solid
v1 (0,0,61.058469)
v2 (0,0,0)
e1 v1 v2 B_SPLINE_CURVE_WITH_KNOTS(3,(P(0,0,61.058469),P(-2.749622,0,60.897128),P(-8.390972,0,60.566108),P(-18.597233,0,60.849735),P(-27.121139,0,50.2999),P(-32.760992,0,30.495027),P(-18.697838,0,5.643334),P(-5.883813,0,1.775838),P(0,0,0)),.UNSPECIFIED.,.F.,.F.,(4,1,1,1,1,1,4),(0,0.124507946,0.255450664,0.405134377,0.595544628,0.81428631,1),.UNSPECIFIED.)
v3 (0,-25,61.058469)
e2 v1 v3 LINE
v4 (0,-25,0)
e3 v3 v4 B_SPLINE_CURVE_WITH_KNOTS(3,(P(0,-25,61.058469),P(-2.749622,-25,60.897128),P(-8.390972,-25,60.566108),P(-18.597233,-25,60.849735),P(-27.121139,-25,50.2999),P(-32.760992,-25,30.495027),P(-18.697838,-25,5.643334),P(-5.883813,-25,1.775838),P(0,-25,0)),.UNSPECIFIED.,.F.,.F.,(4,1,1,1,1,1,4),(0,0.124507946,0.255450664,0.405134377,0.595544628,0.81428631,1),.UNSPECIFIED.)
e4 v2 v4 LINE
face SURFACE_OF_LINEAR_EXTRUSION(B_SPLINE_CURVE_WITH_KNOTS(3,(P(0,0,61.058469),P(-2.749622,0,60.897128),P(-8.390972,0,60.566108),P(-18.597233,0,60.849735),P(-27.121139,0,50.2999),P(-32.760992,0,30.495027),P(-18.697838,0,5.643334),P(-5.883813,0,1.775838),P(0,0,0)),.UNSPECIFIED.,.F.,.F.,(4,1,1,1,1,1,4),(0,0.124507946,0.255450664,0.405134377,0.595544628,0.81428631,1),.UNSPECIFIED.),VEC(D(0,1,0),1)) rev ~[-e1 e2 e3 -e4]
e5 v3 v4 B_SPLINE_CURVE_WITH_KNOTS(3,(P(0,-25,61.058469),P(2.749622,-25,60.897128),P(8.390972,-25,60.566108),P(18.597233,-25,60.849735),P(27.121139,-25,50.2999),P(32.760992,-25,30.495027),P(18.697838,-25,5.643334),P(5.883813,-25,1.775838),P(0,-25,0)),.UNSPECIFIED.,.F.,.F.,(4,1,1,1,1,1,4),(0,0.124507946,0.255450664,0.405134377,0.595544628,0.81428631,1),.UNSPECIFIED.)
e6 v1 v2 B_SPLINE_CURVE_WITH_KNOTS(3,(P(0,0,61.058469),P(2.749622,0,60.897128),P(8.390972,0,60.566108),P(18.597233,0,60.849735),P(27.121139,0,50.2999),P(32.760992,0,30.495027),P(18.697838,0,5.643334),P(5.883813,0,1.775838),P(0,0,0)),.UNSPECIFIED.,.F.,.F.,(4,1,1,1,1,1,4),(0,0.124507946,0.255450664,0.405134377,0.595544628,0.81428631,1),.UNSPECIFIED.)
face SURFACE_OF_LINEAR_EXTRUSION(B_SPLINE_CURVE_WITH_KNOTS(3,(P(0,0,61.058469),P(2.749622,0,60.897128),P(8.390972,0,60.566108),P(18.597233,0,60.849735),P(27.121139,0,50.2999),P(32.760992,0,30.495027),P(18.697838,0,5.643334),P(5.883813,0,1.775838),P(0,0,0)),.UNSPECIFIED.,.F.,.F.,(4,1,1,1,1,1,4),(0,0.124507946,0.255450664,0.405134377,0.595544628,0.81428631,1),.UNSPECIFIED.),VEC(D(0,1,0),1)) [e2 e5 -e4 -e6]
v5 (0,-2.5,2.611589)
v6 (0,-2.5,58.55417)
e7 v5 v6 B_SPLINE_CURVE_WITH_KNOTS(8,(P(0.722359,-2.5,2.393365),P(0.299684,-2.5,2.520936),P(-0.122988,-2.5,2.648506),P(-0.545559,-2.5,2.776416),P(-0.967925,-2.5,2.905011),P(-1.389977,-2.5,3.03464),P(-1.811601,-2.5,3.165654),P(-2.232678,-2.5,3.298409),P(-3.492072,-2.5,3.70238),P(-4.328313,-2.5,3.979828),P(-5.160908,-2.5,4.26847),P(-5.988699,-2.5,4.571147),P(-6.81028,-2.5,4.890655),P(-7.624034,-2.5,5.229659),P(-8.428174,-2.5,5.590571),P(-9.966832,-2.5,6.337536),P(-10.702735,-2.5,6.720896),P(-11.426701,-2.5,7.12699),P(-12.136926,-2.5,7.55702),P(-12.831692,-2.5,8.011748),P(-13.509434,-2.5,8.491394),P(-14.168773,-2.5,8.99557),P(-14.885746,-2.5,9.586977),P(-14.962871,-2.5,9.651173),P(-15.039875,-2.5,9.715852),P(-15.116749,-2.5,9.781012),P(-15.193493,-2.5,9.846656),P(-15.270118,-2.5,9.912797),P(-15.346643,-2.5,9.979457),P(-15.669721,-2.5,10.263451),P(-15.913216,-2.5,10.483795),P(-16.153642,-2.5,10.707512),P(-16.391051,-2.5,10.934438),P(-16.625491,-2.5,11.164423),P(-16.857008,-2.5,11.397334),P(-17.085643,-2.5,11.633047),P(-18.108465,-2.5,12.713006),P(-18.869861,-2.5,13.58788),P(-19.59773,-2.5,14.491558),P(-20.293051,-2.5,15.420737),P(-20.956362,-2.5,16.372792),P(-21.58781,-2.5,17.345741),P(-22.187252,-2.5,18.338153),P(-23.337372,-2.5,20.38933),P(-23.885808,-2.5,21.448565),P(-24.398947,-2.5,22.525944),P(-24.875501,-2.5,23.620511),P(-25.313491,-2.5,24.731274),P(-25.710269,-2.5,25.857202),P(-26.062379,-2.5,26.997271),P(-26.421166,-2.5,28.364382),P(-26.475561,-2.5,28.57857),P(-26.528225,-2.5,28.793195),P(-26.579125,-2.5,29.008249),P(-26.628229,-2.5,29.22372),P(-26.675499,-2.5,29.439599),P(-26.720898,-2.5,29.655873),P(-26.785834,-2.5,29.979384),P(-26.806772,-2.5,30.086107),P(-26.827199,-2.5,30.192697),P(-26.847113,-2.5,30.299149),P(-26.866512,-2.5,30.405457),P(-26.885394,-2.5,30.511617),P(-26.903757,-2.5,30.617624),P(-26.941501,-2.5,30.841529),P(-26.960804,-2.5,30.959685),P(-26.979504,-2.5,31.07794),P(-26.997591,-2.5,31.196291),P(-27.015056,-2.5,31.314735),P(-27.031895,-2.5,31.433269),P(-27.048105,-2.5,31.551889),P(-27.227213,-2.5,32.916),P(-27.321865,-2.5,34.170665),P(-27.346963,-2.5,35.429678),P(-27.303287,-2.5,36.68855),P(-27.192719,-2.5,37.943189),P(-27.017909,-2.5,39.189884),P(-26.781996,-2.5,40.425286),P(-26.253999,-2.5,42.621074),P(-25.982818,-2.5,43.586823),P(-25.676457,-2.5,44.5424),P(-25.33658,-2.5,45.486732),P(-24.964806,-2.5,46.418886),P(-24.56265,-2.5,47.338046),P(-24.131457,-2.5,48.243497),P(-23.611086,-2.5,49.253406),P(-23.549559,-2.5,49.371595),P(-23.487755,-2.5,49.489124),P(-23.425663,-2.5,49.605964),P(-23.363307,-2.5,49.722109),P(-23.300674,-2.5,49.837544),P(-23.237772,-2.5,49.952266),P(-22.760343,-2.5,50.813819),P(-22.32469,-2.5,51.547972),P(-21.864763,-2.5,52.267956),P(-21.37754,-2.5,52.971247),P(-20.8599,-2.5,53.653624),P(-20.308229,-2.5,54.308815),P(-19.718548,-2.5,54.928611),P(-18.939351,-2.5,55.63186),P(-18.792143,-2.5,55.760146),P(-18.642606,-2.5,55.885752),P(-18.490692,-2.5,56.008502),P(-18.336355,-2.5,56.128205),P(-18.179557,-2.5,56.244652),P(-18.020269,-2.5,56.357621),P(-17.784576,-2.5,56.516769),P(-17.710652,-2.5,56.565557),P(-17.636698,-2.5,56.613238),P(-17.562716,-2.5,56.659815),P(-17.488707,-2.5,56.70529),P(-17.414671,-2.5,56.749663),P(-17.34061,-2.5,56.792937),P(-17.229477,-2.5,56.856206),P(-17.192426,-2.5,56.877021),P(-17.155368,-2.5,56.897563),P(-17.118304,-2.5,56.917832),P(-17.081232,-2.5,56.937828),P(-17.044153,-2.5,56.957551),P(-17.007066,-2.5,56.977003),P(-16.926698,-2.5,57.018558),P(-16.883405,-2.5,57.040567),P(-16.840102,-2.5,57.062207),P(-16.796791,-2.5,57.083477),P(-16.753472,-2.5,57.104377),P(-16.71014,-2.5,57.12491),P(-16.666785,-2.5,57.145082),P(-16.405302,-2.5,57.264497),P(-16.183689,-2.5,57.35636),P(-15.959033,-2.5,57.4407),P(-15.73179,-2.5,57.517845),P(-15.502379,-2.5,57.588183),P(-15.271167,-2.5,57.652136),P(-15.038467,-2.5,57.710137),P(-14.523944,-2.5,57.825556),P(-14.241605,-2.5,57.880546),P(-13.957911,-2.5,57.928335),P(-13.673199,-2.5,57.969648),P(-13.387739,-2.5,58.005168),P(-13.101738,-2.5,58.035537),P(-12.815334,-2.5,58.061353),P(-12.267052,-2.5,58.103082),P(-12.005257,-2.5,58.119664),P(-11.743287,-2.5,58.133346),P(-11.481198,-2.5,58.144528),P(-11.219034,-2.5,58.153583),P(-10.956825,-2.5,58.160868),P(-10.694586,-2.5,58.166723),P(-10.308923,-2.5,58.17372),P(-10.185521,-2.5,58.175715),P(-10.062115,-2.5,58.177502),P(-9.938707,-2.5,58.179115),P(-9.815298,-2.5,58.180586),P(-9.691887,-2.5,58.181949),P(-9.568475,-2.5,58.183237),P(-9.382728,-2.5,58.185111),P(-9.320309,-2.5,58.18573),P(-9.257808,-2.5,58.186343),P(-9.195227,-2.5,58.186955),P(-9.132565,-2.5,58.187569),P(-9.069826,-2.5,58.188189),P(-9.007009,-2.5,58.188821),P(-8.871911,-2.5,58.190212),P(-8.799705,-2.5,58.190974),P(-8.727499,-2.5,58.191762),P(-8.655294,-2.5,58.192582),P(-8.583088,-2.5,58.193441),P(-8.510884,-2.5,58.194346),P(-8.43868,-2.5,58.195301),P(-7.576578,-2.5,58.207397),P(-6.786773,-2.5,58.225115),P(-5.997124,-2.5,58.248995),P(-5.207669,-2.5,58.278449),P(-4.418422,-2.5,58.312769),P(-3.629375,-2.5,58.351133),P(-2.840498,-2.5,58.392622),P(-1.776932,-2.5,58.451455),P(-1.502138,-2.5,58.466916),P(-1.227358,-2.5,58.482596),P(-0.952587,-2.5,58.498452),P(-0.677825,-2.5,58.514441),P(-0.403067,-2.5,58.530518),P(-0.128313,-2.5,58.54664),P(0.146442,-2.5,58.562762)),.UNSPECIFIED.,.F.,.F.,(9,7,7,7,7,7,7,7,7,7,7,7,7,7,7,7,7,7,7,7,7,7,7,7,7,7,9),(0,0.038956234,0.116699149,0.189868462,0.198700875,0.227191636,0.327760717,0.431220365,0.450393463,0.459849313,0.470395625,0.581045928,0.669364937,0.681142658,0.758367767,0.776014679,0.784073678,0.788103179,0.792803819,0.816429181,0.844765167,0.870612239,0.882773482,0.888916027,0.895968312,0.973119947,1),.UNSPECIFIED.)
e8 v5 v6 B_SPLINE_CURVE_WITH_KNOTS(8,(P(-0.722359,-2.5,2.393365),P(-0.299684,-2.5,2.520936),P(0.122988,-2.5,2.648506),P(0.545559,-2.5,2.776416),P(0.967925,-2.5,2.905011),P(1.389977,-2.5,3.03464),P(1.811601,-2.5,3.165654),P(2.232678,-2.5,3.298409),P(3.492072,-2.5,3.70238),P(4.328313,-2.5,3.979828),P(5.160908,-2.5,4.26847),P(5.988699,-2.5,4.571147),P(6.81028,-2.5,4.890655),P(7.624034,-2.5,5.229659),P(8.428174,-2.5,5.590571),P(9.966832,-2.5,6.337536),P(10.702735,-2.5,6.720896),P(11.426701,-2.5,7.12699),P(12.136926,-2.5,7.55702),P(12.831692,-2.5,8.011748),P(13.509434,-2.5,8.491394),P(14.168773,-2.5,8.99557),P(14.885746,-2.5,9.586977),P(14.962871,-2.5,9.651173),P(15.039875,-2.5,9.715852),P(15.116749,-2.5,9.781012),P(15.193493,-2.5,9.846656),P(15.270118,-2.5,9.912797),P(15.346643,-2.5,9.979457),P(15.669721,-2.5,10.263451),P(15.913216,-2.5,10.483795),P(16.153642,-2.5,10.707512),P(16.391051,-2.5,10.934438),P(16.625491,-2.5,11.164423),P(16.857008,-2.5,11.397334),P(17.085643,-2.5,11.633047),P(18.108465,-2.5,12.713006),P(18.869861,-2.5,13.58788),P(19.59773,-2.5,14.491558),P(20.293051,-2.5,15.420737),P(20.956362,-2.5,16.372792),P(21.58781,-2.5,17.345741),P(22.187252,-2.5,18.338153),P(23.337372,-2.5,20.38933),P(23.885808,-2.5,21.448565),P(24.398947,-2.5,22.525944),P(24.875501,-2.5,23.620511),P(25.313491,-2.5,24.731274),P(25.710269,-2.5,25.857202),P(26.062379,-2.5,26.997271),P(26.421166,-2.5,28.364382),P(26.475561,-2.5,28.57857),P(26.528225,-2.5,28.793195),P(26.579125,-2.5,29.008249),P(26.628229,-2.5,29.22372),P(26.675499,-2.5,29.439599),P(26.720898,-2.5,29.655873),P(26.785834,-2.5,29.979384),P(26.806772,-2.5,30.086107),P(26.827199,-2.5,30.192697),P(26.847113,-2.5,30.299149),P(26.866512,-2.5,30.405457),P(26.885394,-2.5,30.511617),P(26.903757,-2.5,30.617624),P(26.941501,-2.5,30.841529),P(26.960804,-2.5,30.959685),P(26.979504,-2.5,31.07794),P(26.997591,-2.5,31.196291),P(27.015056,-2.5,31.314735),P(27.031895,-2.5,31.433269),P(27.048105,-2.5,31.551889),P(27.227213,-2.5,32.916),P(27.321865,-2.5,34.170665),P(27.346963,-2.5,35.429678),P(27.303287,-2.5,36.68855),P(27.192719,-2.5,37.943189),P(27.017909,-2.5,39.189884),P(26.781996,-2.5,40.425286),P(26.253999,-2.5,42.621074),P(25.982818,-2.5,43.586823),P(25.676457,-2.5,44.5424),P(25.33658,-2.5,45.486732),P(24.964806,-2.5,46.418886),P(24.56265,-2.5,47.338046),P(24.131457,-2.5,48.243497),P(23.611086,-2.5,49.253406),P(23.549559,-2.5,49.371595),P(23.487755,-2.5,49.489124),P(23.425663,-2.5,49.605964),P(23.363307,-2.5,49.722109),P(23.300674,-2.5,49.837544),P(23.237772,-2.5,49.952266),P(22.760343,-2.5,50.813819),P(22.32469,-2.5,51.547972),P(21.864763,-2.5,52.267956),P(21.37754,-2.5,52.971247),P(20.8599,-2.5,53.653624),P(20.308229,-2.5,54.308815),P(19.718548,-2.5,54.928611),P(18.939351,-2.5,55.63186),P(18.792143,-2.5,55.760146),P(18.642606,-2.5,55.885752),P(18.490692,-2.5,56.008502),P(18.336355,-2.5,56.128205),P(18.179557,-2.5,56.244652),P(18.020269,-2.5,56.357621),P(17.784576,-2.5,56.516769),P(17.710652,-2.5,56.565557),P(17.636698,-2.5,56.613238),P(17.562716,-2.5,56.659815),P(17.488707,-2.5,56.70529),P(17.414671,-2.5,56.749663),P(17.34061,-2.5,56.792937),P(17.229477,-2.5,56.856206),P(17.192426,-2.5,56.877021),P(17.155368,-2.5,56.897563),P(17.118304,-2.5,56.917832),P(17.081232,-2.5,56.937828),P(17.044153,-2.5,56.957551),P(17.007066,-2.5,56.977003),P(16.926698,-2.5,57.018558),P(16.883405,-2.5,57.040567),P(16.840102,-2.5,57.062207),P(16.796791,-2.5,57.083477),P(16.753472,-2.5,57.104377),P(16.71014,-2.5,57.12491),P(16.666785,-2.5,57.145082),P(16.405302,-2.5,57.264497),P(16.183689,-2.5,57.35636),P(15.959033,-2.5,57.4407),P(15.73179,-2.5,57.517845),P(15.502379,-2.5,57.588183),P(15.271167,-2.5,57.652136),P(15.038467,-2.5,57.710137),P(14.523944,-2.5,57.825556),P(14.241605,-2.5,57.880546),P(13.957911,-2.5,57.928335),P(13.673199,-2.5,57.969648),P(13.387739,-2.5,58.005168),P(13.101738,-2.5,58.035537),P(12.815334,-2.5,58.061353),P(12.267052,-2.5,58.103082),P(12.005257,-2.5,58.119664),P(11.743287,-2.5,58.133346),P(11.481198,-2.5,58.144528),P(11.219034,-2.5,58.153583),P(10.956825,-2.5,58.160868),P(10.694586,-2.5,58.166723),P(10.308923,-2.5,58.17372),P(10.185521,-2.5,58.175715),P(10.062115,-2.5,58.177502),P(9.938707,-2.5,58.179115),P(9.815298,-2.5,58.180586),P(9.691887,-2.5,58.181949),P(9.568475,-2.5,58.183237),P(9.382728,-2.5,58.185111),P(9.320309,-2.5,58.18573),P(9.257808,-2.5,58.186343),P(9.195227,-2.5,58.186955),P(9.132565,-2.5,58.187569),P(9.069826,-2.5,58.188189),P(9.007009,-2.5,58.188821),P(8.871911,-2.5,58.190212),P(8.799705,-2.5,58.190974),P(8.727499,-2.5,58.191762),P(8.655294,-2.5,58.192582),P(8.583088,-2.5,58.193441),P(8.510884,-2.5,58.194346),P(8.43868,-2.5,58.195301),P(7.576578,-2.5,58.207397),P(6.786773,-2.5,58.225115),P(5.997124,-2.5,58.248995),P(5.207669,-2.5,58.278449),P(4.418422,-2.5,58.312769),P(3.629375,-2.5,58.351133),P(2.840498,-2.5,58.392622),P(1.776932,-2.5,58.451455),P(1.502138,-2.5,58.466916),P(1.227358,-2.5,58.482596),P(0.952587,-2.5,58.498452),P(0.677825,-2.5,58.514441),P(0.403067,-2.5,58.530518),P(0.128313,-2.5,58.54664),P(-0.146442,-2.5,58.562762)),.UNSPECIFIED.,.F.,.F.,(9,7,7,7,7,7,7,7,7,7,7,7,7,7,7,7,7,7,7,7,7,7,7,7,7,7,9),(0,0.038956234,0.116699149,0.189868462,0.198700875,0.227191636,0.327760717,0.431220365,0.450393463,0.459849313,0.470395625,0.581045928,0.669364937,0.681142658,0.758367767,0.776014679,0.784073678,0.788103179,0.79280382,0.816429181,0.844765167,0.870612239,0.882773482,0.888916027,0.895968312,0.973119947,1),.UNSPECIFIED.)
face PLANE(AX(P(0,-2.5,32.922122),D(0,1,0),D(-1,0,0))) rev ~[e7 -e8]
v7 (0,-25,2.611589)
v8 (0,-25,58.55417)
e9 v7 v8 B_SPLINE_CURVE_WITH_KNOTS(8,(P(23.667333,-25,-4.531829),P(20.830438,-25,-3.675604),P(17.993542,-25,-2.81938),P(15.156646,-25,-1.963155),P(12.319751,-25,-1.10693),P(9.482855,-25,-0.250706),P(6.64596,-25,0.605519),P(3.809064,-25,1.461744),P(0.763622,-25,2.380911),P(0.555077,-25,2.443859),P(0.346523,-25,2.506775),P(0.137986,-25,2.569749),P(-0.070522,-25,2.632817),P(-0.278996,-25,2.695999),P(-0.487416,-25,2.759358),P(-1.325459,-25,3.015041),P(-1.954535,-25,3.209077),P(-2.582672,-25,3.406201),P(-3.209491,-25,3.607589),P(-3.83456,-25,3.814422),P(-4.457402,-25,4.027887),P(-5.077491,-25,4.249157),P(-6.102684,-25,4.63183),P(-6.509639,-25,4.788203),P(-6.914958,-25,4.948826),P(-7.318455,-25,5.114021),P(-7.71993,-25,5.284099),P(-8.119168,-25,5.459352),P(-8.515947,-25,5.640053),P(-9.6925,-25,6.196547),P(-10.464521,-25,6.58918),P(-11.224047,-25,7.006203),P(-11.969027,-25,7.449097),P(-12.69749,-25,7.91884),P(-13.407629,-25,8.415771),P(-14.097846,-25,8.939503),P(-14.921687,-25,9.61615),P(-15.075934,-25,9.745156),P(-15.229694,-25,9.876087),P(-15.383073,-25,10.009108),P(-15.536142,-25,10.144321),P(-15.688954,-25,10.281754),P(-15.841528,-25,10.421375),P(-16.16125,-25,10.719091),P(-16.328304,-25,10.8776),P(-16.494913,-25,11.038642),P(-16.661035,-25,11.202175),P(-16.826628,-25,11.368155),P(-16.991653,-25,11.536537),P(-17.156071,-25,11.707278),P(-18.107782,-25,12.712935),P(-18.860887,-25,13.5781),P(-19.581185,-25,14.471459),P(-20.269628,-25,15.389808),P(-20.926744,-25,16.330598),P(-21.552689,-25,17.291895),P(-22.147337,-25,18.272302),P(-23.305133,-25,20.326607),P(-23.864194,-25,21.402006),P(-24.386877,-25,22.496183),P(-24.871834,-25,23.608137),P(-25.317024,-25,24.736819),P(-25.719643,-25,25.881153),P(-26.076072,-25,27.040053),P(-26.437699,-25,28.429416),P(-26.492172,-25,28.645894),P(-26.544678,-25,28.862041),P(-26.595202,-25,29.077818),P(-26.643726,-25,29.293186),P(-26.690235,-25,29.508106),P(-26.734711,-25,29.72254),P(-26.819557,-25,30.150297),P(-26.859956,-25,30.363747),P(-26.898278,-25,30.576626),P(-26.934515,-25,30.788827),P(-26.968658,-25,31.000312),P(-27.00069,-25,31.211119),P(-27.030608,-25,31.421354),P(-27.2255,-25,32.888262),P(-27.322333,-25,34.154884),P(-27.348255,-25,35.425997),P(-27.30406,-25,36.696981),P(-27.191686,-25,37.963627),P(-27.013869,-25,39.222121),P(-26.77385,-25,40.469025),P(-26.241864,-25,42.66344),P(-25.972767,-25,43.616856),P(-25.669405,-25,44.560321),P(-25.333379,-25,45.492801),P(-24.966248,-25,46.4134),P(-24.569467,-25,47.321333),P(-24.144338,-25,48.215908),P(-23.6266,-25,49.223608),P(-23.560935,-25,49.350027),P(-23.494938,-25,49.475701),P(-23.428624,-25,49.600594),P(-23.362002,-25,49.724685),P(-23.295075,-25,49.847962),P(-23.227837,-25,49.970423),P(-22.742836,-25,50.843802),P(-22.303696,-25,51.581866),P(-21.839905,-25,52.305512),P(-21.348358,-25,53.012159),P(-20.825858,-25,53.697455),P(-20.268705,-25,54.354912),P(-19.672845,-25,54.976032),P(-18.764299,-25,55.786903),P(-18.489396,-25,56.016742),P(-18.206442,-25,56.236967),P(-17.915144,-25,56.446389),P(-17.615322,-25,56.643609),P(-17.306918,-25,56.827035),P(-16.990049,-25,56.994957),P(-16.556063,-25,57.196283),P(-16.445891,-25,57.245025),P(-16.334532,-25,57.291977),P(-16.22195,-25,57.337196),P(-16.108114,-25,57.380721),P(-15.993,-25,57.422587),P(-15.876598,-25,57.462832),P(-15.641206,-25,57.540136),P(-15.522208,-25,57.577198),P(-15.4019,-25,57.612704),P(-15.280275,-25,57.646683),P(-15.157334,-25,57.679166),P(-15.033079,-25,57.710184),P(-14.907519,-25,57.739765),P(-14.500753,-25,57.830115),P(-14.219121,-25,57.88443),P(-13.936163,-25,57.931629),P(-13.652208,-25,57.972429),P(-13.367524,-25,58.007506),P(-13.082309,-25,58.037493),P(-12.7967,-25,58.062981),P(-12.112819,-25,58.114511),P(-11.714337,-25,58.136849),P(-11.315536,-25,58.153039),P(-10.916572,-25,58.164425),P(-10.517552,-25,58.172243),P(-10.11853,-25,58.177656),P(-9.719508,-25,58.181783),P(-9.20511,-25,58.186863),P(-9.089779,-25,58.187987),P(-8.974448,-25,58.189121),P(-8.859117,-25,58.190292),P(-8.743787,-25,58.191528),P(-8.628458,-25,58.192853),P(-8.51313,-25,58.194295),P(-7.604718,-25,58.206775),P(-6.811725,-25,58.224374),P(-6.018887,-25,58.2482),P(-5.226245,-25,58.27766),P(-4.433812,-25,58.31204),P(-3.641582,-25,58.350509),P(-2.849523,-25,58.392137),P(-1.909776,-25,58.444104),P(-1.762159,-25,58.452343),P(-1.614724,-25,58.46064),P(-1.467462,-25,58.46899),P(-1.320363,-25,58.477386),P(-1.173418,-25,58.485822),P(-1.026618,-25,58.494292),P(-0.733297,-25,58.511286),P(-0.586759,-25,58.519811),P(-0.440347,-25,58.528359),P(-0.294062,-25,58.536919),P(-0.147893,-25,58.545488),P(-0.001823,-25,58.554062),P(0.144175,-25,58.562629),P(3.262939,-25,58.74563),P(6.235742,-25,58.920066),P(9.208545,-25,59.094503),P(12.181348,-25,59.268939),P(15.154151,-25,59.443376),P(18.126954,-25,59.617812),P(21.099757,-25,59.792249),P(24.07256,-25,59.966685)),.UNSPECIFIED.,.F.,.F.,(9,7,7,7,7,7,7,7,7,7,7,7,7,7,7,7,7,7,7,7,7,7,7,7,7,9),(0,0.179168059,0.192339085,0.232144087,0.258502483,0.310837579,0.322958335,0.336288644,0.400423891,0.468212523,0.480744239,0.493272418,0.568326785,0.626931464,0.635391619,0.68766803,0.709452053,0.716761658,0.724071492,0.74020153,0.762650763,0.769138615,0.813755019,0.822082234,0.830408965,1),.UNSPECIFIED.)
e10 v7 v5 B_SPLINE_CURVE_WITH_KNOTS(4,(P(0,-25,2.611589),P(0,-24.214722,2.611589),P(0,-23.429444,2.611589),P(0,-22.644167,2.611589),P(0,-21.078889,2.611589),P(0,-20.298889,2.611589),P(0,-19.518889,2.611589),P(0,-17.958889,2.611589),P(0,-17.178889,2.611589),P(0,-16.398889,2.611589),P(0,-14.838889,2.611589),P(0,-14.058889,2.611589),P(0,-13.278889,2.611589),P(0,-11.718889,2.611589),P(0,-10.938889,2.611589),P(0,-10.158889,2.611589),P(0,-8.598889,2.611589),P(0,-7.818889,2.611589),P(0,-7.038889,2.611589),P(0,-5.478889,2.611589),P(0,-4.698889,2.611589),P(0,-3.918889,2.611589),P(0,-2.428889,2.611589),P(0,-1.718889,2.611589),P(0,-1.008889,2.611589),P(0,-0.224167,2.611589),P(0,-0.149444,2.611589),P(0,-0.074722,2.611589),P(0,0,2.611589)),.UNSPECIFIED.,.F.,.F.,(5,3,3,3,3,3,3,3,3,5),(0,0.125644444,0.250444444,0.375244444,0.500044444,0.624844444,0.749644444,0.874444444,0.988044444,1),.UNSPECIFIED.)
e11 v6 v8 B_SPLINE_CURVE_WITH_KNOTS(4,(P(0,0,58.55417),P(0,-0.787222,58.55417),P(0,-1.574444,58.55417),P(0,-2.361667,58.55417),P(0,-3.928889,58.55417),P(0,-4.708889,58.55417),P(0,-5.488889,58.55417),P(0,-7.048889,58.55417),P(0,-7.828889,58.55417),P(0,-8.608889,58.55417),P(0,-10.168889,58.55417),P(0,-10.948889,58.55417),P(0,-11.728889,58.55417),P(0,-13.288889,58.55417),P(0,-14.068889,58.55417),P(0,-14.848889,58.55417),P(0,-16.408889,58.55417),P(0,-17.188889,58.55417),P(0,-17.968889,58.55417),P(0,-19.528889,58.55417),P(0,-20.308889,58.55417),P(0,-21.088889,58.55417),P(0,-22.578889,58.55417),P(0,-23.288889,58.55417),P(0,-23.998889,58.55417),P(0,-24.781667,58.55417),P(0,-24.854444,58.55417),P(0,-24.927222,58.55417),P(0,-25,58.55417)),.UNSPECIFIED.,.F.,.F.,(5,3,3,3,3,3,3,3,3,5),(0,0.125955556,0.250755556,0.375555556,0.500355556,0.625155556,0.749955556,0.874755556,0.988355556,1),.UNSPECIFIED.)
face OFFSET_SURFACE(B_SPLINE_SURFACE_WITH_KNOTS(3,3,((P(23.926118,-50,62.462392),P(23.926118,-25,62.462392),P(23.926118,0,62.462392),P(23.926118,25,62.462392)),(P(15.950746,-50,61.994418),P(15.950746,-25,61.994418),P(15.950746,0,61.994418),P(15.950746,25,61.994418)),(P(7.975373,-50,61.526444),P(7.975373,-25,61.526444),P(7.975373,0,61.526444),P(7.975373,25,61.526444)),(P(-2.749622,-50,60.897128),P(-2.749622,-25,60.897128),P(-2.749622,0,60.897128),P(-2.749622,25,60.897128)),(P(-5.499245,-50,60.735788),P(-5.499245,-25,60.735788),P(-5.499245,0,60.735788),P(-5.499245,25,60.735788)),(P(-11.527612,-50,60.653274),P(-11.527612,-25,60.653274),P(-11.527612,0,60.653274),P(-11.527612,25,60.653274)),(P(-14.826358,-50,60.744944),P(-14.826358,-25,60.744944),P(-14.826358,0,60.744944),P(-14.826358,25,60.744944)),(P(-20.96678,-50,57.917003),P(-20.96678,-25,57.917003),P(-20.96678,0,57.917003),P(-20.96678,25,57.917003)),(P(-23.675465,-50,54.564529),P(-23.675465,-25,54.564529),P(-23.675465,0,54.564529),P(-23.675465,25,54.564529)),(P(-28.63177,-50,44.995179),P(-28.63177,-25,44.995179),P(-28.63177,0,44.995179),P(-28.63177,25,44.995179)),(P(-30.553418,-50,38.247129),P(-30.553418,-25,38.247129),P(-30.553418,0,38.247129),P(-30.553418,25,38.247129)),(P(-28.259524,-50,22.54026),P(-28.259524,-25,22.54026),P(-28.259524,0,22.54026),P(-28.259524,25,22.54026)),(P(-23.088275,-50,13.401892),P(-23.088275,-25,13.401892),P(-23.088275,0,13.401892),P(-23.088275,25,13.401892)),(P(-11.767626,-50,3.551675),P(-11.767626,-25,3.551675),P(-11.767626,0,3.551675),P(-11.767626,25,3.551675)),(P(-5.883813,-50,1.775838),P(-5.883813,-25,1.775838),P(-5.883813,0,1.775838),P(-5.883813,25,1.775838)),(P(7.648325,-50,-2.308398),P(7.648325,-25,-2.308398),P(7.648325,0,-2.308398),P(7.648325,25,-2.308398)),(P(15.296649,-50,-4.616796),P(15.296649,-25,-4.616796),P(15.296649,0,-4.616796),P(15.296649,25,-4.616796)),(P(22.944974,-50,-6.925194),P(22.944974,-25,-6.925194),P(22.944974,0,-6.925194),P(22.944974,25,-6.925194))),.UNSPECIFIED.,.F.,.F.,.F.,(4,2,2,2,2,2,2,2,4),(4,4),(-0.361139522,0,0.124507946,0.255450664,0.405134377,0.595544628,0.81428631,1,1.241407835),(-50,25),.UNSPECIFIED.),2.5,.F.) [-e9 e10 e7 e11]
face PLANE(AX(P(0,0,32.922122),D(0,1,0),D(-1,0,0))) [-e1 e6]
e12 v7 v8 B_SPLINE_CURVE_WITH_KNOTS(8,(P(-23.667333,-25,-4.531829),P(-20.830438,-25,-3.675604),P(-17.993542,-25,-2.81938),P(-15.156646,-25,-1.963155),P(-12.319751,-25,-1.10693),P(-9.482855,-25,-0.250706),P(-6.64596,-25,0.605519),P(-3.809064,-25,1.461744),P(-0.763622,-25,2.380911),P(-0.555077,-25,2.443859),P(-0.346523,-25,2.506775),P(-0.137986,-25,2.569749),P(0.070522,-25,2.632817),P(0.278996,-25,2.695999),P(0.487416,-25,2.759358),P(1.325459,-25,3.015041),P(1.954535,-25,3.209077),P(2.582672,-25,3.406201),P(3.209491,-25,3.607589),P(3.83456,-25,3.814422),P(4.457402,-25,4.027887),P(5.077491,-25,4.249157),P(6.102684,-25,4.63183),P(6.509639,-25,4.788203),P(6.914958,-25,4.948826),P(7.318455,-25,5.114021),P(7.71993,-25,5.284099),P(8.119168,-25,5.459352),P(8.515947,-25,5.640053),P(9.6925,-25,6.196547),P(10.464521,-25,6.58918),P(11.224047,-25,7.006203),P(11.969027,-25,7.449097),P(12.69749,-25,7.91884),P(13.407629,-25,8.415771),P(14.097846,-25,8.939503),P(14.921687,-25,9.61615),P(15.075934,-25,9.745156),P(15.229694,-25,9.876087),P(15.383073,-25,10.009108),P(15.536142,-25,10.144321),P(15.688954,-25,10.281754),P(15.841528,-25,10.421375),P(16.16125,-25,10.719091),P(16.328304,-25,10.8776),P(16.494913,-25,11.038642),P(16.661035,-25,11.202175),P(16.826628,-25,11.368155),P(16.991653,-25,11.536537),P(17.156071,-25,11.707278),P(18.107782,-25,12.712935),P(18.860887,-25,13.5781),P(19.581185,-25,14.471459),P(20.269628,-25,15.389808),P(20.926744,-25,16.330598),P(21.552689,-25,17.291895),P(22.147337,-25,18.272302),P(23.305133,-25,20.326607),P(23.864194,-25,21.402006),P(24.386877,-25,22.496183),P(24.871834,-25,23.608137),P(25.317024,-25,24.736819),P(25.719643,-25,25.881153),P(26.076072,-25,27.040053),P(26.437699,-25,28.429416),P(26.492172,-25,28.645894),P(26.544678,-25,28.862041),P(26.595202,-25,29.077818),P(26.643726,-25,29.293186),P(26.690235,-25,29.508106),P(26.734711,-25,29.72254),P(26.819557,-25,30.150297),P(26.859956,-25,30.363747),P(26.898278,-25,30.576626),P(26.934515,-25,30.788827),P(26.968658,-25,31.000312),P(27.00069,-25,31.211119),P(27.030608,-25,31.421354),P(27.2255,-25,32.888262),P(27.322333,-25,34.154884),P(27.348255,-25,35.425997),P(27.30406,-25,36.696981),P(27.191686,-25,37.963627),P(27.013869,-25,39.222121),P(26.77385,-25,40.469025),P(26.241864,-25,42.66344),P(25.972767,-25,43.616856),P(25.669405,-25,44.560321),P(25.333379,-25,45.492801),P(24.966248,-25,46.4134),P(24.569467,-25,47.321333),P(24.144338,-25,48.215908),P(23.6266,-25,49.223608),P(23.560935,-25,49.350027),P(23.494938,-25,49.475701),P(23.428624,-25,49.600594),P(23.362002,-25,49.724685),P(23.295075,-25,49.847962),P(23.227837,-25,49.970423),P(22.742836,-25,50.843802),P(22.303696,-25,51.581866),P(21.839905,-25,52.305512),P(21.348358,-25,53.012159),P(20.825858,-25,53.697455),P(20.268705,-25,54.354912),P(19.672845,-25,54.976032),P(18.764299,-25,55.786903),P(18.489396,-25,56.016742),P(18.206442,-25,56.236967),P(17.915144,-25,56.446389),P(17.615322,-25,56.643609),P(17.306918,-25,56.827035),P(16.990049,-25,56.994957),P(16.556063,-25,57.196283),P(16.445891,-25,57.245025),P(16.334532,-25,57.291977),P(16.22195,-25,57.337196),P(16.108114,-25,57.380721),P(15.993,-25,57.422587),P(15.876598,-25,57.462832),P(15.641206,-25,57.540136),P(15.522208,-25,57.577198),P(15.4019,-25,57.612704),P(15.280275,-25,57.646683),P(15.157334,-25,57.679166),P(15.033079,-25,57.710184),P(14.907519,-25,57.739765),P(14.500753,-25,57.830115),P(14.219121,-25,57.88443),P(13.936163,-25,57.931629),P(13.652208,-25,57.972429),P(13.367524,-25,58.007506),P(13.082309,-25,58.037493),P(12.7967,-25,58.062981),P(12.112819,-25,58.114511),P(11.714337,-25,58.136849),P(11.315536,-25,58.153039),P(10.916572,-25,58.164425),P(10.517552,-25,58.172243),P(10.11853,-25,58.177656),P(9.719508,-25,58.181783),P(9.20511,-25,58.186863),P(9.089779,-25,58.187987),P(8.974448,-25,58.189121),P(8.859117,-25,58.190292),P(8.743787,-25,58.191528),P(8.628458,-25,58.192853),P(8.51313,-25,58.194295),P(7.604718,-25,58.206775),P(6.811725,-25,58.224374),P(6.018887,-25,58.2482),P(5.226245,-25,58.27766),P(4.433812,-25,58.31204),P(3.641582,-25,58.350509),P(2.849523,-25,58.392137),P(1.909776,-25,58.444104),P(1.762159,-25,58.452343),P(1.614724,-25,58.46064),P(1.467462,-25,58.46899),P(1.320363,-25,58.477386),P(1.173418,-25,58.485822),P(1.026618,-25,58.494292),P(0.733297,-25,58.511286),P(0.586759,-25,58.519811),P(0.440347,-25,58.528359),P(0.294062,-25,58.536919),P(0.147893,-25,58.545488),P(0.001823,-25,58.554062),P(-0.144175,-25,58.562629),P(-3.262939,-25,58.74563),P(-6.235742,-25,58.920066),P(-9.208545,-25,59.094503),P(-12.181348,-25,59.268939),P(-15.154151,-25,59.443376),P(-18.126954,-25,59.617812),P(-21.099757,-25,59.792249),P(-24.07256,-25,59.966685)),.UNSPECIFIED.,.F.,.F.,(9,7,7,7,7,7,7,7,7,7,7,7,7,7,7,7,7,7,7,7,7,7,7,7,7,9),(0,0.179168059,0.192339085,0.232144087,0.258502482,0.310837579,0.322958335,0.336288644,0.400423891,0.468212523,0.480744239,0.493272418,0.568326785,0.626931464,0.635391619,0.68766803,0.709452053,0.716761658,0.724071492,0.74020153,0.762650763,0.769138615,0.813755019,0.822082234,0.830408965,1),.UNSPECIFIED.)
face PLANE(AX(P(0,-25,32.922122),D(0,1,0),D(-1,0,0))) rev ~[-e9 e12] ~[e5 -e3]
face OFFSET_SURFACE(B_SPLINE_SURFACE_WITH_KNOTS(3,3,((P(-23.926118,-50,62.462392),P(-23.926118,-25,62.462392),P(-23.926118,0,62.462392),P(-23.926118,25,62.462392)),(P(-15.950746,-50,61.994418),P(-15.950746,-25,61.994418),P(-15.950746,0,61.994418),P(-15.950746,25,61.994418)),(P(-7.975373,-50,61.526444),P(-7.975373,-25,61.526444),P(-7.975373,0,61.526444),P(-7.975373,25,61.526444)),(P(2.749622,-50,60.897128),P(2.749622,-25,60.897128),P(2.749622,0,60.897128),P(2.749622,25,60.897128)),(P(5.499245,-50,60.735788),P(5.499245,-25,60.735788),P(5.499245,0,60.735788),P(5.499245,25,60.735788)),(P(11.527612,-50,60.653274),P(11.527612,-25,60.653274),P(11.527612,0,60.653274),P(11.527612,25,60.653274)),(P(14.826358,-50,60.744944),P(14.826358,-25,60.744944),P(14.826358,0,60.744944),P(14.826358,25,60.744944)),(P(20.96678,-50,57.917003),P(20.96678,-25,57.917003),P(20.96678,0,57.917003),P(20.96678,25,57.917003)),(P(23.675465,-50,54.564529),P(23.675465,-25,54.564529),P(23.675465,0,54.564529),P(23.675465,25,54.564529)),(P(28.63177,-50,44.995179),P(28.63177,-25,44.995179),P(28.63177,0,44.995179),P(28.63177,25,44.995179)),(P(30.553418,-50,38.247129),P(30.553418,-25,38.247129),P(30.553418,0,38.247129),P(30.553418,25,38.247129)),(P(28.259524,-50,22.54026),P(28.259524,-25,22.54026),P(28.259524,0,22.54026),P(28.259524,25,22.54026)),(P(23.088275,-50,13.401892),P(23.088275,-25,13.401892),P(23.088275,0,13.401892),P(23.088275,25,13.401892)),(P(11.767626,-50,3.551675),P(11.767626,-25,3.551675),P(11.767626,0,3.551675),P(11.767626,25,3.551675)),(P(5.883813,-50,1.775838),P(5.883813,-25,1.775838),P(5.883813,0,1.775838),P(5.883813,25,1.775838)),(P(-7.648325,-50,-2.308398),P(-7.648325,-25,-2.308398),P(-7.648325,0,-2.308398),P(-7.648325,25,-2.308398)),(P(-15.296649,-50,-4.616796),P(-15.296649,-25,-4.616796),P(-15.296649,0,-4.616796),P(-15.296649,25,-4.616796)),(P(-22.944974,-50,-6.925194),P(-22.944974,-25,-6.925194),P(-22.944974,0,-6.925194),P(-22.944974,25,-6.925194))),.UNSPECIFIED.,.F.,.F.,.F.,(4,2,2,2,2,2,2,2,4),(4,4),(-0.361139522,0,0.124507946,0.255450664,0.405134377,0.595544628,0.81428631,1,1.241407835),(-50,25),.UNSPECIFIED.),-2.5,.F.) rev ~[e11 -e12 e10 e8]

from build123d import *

# Parameters (mm, degrees)
F1_DEPTH = 25
F2_T     = -2.5


with BuildPart() as f1:
    # F0 (on Front) → F1 (new body)
    with BuildSketch(Plane.XZ):
        with BuildLine():
            add(Edge.make_bspline(
                [(0, 61.0584691167), (2.7496223119, 60.8971283441), (8.3909718756, 60.5661084463), (18.5972333394, 60.849734506), (27.1211390751, 50.2998999845), (32.7609921647, 30.4950267283), (18.6978379575, 5.64333428), (5.8838131464, 1.7758376397), (0, 0)],
                knots=[0, 0, 0, 0, 0.124507946, 0.2554506645, 0.4051343765, 0.5955446281, 0.8142863098, 1, 1, 1, 1], degree=3))
            add(Edge.make_bspline(
                [(0, 61.0584691167), (-2.7496223119, 60.8971283441), (-8.3909718756, 60.5661084463), (-18.5972333394, 60.849734506), (-27.1211390751, 50.2998999845), (-32.7609921647, 30.4950267283), (-18.6978379575, 5.64333428), (-5.8838131464, 1.7758376397), (0, 0)],
                knots=[0, 0, 0, 0, 0.124507946, 0.2554506645, 0.4051343765, 0.5955446281, 0.8142863098, 1, 1, 1, 1], degree=3))
        make_face()
    extrude(amount=F1_DEPTH)

    # F2
    f2_openings = [f1.faces().sort_by_distance(p)[0] for p in [
        (0, -25, 32.818445),
    ]]
    offset(amount=F2_T, openings=f2_openings)


solid = f1.part
